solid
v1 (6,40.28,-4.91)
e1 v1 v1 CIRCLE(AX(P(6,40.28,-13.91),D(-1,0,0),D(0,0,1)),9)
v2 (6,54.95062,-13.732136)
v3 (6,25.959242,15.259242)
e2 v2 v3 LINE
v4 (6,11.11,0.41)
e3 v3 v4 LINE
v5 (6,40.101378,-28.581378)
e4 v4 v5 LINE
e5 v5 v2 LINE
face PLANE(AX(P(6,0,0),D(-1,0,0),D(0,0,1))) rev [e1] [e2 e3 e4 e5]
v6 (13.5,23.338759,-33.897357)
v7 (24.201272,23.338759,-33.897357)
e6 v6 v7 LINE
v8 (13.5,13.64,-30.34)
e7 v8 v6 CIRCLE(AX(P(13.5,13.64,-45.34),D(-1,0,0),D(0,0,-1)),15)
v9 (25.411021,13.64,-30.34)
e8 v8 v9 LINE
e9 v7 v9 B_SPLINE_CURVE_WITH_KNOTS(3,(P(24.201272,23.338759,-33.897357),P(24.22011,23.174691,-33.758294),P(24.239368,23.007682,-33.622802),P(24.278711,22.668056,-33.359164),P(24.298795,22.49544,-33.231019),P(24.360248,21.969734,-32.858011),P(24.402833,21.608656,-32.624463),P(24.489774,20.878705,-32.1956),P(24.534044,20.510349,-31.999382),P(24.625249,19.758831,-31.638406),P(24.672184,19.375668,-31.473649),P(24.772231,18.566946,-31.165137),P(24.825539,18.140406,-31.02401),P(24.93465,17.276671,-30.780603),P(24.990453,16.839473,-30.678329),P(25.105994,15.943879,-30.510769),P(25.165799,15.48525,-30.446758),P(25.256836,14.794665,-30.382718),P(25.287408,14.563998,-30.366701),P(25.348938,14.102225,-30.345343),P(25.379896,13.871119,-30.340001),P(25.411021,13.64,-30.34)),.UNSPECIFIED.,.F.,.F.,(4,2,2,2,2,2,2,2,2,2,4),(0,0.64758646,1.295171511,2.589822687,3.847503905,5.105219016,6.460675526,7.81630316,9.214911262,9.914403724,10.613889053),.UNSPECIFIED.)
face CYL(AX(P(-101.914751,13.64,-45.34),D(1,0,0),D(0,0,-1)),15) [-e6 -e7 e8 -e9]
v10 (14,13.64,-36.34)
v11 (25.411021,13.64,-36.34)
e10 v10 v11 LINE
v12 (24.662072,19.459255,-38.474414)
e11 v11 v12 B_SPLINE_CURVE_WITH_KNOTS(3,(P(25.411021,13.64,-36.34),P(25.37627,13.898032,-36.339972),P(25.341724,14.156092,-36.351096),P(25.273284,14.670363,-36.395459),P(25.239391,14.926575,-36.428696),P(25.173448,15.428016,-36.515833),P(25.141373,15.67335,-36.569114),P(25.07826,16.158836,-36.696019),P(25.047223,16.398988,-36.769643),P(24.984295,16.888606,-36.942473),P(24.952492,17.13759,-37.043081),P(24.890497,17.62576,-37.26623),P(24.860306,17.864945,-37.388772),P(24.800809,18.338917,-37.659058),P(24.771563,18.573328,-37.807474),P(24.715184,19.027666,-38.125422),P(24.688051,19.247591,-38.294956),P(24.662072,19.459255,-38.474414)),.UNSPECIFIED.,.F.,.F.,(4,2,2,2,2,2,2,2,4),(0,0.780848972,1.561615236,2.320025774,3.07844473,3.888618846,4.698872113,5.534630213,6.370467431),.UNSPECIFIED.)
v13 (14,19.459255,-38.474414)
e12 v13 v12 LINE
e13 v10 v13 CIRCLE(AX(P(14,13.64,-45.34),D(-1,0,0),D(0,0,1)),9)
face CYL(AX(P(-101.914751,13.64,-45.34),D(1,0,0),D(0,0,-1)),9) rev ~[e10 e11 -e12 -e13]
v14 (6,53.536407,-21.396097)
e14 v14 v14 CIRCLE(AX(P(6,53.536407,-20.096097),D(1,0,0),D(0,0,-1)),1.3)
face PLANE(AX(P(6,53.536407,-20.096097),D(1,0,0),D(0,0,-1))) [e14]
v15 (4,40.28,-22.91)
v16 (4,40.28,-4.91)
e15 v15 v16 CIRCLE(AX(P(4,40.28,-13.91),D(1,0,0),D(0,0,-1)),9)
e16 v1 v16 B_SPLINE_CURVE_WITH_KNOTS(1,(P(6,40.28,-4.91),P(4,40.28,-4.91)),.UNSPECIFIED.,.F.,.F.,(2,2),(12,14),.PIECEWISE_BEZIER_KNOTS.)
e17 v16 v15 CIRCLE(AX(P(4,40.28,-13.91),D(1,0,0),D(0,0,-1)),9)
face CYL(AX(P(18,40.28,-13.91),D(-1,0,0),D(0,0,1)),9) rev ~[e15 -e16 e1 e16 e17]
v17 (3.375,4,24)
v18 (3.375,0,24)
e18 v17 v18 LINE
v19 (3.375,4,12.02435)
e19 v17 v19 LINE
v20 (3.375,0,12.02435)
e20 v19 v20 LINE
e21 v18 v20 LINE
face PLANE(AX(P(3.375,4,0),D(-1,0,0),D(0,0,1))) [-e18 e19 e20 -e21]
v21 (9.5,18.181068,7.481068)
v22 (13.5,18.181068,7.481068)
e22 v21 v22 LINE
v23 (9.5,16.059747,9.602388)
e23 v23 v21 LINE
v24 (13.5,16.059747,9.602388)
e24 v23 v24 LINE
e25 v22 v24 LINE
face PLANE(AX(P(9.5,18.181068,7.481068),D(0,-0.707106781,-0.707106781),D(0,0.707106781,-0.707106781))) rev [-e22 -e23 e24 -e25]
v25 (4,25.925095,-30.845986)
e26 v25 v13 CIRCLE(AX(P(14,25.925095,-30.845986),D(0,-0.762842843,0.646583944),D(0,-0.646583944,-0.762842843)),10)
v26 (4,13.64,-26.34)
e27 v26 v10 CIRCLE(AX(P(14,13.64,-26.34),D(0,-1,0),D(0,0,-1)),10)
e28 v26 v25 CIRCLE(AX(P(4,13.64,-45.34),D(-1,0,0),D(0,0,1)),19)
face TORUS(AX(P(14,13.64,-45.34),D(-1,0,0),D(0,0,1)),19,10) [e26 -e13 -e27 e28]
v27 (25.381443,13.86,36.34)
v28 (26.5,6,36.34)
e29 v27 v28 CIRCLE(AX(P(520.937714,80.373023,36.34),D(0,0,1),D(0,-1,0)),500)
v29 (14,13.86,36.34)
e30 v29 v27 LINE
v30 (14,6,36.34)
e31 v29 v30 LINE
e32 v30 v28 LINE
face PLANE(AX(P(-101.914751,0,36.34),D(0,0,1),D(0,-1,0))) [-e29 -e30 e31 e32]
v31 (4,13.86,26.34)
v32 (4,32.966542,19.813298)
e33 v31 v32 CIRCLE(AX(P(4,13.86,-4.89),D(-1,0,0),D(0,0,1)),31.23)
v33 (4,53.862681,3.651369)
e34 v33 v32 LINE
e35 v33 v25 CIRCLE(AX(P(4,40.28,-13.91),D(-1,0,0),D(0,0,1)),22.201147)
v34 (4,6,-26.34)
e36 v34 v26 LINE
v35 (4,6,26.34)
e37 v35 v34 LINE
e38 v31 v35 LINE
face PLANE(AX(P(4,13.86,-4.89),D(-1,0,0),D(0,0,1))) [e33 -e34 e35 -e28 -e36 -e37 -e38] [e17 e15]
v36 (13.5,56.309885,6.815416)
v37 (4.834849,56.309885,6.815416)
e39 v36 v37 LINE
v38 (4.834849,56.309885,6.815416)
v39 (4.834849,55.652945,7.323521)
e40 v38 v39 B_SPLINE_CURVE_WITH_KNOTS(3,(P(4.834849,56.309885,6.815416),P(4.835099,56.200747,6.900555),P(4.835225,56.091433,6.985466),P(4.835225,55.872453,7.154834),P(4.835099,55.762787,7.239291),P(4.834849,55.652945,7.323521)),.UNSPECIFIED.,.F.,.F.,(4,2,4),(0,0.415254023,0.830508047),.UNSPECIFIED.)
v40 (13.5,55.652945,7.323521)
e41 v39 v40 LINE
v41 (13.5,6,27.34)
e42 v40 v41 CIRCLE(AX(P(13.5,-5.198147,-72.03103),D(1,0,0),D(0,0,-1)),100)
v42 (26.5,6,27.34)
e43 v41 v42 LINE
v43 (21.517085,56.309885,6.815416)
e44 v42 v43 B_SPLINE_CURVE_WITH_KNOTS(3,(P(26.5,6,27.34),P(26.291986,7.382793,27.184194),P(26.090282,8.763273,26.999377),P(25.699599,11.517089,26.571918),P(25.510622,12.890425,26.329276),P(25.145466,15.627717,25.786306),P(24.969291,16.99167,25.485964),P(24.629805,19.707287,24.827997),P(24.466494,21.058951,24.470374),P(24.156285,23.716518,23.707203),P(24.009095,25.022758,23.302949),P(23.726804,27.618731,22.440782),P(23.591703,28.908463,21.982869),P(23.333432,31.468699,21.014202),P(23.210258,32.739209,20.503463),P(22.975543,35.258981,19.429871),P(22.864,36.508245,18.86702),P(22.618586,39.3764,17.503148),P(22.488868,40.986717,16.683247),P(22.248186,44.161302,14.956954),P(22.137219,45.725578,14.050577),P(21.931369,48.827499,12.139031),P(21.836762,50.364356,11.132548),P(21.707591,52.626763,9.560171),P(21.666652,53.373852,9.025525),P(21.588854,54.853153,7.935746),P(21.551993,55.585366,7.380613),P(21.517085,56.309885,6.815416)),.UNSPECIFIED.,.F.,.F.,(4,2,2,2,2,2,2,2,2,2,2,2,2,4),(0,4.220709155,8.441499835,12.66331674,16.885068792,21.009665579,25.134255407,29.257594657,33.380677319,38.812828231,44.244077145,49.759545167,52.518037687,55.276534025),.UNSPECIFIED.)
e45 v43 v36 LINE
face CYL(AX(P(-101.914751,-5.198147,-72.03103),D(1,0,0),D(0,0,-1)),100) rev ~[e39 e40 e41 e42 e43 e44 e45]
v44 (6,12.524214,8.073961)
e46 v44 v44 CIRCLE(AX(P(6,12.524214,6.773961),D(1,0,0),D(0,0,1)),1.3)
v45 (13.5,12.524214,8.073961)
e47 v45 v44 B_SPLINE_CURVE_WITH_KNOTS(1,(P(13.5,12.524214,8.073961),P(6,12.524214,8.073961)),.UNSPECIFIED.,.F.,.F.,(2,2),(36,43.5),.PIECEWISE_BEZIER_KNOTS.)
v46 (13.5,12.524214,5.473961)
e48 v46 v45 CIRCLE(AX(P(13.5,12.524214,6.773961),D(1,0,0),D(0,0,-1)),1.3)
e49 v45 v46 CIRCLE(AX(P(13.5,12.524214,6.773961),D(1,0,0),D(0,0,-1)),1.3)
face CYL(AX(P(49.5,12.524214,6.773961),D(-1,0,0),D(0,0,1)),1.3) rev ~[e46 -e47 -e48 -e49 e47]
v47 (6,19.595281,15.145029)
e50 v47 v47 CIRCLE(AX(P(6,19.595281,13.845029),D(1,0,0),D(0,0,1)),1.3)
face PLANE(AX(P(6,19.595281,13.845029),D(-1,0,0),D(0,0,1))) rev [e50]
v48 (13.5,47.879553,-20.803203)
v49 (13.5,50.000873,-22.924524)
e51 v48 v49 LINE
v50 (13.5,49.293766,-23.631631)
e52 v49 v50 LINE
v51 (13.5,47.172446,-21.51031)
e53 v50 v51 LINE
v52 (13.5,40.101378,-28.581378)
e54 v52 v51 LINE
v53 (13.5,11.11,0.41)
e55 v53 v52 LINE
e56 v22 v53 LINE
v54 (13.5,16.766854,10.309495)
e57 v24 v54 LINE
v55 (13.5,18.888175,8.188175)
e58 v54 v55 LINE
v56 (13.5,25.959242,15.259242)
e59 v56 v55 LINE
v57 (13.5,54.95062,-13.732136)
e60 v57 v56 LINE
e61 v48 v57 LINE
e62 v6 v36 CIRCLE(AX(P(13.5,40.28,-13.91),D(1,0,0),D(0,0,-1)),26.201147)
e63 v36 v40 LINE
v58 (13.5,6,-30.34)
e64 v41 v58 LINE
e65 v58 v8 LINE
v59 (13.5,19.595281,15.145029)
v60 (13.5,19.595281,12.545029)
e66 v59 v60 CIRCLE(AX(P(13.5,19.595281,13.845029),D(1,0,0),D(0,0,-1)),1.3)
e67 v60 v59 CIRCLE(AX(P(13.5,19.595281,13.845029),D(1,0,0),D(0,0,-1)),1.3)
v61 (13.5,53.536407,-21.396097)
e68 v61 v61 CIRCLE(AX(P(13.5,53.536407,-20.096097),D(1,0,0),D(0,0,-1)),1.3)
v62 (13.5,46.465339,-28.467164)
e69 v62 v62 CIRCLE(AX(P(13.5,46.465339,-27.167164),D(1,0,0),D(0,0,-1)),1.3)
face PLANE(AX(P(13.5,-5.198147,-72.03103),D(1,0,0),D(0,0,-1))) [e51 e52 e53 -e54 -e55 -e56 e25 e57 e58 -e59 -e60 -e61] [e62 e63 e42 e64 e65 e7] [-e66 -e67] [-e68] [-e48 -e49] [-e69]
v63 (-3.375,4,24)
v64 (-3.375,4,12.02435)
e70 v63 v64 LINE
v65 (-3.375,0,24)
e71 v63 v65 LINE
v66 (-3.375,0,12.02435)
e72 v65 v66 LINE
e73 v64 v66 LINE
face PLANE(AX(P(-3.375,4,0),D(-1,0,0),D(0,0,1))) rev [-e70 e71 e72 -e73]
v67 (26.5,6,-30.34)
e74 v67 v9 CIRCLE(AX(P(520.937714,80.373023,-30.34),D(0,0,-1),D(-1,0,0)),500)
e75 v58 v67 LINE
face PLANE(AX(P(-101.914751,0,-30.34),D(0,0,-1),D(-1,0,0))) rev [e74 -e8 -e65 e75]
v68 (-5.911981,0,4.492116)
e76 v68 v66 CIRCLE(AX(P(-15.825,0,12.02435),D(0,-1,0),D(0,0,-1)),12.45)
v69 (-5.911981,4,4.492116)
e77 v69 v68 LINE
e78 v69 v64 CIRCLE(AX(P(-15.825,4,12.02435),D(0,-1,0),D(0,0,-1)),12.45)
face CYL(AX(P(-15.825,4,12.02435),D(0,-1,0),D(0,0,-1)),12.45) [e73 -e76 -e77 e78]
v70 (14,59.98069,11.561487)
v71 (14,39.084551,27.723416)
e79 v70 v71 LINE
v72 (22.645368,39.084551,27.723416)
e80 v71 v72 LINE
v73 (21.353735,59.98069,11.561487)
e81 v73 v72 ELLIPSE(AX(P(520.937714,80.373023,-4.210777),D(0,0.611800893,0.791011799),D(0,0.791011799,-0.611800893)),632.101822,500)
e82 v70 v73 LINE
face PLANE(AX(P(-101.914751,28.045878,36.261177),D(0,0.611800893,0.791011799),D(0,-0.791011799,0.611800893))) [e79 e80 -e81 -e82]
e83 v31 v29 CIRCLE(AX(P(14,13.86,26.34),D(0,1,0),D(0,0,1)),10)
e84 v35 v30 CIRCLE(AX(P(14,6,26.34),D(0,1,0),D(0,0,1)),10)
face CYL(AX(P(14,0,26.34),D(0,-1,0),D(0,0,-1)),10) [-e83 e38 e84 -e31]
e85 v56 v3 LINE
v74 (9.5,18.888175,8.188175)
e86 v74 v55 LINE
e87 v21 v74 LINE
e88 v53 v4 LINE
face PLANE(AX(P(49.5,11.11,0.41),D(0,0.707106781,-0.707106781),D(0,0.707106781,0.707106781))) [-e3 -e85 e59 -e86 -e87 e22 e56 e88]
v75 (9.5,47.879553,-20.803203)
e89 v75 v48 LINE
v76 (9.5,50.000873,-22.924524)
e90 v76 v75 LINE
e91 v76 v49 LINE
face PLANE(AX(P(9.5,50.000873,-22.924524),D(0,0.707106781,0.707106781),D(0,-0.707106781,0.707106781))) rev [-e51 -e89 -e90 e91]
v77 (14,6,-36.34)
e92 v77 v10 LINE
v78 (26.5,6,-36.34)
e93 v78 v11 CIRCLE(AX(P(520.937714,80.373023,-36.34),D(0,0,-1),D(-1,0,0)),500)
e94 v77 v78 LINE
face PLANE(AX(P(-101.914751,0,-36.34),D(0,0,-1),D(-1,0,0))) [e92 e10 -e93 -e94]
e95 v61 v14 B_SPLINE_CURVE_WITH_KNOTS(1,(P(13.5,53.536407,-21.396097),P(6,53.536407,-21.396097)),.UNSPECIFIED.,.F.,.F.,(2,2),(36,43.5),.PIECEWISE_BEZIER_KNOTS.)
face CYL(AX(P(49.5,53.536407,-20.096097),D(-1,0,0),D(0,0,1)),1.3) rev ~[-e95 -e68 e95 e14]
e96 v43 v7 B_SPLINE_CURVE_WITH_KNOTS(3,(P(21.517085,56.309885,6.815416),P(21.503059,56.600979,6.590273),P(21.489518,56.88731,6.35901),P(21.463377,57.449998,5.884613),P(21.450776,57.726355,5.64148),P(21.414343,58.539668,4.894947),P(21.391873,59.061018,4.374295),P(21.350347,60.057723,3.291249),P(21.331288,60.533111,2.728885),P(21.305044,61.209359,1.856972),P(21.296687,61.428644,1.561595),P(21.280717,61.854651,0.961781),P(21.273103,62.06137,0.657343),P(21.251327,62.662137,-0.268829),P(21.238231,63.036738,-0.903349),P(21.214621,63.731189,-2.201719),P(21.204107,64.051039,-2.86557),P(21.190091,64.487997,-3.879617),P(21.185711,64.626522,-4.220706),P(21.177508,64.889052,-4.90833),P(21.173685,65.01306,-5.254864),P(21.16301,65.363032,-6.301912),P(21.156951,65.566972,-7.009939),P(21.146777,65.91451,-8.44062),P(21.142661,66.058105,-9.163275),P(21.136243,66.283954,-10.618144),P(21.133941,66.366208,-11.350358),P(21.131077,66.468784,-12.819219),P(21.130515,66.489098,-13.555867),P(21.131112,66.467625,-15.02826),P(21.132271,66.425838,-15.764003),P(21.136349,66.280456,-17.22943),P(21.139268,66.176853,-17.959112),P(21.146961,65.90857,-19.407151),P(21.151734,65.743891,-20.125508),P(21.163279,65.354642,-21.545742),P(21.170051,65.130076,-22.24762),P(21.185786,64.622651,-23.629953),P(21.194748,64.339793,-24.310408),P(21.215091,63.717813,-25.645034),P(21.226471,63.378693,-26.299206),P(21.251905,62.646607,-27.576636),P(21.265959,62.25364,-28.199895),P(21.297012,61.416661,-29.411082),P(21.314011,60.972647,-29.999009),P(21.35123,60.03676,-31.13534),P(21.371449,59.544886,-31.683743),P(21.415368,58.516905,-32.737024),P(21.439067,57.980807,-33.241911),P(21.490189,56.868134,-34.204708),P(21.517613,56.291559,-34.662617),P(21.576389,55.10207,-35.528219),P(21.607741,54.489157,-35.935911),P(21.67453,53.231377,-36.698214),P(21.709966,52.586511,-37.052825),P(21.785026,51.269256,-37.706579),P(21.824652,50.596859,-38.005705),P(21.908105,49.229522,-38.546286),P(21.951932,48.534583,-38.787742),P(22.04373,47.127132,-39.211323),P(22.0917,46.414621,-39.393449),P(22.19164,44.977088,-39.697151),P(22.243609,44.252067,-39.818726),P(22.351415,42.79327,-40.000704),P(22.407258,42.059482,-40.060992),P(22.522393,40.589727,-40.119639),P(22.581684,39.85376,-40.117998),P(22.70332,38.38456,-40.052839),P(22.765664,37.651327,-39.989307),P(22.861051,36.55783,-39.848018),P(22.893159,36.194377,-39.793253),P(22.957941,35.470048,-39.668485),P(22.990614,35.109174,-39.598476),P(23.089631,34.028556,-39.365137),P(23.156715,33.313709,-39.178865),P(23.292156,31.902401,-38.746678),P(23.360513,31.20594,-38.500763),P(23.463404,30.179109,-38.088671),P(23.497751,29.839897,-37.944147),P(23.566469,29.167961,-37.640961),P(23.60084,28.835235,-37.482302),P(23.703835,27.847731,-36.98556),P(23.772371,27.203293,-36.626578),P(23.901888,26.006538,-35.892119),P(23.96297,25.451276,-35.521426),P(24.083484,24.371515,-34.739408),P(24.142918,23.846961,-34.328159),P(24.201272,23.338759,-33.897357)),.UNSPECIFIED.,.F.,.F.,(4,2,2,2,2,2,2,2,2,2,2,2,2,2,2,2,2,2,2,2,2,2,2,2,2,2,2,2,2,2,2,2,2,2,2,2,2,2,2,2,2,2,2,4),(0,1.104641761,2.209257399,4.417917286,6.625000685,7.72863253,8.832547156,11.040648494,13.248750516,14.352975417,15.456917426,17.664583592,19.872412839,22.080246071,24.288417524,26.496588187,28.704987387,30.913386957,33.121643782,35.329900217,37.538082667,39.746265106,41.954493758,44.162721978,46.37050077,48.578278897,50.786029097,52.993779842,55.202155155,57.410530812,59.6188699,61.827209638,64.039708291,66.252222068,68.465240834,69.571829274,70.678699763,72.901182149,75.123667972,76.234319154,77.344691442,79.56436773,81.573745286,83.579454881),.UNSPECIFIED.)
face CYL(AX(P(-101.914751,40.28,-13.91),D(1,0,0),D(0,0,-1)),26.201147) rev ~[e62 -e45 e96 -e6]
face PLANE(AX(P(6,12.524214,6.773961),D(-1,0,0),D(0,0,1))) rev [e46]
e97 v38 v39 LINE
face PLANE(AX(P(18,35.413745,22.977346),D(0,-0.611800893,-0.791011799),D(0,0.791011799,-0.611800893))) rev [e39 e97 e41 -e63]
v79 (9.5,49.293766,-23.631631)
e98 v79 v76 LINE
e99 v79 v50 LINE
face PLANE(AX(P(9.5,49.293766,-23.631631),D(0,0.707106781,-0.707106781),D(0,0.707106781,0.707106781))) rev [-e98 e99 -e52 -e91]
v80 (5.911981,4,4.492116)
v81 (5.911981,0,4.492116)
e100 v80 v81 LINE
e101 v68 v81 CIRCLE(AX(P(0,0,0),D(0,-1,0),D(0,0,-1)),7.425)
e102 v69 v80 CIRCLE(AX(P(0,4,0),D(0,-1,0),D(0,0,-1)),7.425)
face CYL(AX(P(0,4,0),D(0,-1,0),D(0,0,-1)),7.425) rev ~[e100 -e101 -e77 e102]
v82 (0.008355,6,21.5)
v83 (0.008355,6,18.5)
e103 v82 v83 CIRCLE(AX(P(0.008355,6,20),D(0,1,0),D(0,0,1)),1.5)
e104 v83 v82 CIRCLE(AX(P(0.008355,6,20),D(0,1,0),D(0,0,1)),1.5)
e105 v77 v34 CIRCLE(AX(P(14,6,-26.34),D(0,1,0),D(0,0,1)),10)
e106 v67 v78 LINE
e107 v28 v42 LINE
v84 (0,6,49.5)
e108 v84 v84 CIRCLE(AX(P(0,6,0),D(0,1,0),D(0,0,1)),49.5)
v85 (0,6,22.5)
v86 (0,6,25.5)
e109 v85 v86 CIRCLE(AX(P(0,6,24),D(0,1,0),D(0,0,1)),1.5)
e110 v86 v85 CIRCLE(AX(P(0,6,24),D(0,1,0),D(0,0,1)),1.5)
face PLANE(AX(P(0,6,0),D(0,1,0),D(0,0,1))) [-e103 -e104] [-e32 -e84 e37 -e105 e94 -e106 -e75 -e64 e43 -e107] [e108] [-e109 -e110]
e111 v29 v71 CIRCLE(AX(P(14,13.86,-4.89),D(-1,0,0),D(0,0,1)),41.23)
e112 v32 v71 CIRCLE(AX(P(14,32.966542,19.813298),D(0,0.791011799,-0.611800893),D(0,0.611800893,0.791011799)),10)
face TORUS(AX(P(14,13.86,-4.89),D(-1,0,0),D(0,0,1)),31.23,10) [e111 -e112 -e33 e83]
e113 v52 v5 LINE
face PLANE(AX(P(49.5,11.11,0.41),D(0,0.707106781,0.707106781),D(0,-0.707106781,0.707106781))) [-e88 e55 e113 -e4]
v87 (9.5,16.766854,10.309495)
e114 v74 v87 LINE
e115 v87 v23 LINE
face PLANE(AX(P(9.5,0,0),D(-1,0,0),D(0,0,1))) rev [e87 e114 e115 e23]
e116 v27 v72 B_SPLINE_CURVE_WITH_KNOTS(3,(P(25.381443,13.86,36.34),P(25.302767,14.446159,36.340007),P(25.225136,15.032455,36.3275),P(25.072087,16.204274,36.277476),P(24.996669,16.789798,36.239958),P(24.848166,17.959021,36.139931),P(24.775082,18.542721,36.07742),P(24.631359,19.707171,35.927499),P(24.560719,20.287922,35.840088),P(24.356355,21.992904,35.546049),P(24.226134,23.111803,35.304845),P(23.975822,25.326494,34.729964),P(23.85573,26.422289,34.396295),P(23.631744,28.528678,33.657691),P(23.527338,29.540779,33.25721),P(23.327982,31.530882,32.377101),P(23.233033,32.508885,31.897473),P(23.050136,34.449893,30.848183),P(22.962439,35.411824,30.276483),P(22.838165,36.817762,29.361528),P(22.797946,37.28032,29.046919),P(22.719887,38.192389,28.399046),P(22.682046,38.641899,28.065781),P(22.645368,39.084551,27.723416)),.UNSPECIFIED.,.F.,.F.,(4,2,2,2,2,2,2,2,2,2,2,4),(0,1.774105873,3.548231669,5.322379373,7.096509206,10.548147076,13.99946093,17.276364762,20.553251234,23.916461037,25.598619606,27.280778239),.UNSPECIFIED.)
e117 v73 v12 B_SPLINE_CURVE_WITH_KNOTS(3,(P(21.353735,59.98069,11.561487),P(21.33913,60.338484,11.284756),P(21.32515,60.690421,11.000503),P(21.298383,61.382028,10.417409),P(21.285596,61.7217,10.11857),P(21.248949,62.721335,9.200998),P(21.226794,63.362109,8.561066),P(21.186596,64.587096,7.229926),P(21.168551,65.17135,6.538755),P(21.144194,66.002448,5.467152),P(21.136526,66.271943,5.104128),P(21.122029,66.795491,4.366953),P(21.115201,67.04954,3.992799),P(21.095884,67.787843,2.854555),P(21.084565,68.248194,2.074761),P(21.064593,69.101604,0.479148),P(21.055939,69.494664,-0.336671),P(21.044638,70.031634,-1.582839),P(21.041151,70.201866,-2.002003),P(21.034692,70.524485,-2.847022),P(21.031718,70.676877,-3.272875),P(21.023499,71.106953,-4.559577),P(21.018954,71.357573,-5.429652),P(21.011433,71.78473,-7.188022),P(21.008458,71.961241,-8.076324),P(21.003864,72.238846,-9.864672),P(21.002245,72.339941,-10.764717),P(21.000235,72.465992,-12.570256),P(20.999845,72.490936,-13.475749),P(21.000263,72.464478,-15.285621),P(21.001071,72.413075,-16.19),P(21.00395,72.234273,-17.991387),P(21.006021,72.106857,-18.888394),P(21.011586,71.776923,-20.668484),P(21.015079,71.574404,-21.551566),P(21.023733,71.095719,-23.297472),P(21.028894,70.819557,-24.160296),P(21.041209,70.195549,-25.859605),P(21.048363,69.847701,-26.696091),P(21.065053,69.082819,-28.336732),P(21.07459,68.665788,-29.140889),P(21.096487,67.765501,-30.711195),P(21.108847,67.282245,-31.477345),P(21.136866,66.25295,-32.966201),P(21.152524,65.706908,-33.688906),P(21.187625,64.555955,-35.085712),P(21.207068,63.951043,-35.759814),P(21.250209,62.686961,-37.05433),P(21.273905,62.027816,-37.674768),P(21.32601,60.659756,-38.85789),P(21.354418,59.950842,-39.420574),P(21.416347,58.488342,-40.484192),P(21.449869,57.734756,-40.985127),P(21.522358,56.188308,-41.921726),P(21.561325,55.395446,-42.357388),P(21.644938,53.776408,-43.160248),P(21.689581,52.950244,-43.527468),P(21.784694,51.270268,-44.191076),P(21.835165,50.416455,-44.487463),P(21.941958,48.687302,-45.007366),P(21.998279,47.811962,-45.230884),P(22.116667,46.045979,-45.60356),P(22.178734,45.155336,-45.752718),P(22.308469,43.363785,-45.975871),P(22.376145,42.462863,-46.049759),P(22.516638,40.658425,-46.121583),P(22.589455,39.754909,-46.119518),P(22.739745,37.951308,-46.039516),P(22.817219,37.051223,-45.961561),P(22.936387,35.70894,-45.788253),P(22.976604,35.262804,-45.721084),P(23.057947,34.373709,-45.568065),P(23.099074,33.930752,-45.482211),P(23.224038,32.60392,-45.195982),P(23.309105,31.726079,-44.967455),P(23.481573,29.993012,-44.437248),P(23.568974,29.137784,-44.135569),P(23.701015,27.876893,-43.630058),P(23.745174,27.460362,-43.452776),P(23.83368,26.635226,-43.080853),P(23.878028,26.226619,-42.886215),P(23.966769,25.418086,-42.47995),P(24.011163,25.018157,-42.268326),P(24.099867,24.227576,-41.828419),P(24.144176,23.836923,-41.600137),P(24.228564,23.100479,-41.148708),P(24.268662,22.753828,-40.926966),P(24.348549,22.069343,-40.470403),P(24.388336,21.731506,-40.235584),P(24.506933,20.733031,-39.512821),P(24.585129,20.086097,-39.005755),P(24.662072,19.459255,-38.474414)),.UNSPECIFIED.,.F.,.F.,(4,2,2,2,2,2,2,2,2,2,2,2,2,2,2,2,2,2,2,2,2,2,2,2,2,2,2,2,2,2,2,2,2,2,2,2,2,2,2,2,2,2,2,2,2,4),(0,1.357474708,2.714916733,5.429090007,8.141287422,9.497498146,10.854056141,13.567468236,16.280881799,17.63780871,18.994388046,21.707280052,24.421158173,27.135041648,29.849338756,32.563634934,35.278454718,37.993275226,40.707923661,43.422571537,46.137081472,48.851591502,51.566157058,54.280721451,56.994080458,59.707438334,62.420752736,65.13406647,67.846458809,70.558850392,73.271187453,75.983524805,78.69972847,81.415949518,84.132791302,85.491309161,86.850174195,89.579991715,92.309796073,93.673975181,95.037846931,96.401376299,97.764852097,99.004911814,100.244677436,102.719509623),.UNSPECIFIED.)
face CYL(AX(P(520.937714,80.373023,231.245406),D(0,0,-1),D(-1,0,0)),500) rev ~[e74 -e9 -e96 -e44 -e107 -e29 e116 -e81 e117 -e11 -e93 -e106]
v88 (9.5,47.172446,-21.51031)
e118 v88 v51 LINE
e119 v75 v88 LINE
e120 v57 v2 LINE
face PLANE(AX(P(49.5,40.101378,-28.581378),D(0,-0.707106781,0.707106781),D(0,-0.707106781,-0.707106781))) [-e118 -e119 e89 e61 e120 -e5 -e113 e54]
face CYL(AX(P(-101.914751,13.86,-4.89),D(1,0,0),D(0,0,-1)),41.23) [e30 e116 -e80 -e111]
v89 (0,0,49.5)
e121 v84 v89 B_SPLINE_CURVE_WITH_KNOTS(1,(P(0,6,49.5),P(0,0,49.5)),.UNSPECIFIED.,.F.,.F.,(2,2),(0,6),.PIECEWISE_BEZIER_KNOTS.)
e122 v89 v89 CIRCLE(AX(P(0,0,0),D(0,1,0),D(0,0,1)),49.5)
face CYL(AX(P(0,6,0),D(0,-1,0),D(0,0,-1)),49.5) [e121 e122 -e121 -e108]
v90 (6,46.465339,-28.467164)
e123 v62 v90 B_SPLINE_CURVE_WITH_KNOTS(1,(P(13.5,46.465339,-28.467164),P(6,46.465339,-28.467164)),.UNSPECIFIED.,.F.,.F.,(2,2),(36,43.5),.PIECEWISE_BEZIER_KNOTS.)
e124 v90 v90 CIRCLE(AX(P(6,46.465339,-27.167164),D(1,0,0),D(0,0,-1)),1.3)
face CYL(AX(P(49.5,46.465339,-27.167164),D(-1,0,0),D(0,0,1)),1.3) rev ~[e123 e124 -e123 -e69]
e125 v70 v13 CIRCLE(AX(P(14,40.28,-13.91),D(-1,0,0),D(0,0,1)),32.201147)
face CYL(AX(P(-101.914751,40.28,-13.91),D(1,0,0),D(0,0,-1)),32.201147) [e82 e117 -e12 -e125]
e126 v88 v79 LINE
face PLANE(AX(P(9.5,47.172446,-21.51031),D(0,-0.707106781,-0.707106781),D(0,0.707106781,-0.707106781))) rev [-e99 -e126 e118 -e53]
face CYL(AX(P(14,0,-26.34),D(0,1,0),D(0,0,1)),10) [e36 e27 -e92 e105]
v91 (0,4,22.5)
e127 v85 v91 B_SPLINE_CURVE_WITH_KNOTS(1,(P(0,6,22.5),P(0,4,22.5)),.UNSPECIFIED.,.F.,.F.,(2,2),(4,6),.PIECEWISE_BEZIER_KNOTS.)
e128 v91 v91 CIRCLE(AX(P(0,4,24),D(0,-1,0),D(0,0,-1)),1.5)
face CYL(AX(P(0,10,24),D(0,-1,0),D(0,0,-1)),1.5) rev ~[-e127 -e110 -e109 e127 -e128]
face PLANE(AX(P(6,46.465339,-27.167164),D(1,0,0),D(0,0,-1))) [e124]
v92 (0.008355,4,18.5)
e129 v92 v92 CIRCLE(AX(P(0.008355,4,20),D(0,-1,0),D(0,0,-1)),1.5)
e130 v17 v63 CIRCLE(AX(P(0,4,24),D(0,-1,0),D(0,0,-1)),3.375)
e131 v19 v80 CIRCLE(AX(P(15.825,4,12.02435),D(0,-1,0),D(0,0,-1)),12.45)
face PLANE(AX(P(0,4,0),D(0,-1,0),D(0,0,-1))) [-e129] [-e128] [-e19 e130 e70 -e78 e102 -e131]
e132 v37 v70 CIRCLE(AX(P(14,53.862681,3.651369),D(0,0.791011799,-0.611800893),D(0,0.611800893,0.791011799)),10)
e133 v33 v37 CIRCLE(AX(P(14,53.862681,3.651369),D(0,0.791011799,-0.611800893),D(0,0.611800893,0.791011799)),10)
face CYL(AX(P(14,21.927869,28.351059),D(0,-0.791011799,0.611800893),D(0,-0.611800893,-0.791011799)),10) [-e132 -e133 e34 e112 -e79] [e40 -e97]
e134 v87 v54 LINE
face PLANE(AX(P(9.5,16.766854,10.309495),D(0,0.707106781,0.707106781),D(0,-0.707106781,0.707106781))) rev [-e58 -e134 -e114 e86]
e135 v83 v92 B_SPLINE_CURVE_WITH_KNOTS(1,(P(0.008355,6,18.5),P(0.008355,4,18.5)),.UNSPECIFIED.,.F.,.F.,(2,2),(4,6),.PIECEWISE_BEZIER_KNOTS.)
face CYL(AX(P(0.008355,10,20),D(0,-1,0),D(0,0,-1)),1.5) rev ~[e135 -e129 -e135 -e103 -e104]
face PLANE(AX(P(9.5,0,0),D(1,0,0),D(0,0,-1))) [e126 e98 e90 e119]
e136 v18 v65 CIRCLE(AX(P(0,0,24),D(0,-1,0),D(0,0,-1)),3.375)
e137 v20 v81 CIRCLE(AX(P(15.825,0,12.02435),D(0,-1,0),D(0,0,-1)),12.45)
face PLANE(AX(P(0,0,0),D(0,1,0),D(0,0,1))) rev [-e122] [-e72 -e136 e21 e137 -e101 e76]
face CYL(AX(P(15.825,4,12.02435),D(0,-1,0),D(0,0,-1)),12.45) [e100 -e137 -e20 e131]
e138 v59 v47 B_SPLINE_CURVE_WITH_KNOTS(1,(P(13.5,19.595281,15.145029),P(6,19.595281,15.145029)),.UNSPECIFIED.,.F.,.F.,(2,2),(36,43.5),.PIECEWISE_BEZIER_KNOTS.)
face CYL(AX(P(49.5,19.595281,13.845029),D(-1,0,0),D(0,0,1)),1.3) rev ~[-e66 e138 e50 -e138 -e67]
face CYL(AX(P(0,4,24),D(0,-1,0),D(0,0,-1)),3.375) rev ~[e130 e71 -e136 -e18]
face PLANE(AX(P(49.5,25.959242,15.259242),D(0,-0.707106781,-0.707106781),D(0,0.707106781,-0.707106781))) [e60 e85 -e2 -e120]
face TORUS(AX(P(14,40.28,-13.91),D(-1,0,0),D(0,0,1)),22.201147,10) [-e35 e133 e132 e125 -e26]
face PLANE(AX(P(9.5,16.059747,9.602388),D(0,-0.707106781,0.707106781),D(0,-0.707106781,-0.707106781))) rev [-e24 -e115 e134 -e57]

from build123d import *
from build123d.topology import SkipClean

# Parameters (mm, degrees)
SKETCH1_R                       = 49.5
BOSS_EXTRUDE1_DEPTH             = 6
BOSS_EXTRUDE2_START             = 4
SKETCH3_R                       = 9
BOSS_EXTRUDE2_DEPTH             = 14
SKETCH4_R                       = 1.5
CUT_EXTRUDE2_DEPTH              = 4
CUT_EXTRUDE3_START              = 6
SKETCH5_R                       = 1.3
CUT_EXTRUDE3_DEPTH              = 91.541405022
BOSS_EXTRUDE3_DEPTH             = 9
BOSS_EXTRUDE3_DIRECTION_2_REACH = 108.894
CUT_EXTRUDE4_DEPTH              = 101.767140704
CUT_EXTRUDE4_DEPTH_BACK         = 101.767140704
FILLET1_R                       = 10
SKETCH4_3_R                     = 1.5
CUT_EXTRUDE5_DEPTH              = 10
CUT_EXTRUDE6_DEPTH              = 8.5
CUT_EXTRUDE8_START              = -4.5
CUT_EXTRUDE8_DEPTH              = 4.5


with BuildPart() as part:
    # Sketch1 → Boss-Extrude1 (new body)
    with BuildSketch(Plane(origin=(0, 0, 0), x_dir=(1, 0, 0), z_dir=(0, 1, 0))):
        with Locations(Location((0, 0, 0), (0, 0, 270))):
            Circle(SKETCH1_R)
    extrude(amount=BOSS_EXTRUDE1_DEPTH)

    # Sketch3 → Boss-Extrude2 (add)
    with BuildSketch(Plane(origin=(0, 0, 0), x_dir=(0, 0, -1), z_dir=(1, 0, 0)).offset(BOSS_EXTRUDE2_START)):
        with BuildLine():
            Line((30.34, 6), (-30.34, 6))
            Line((-30.34, 6), (-30.34, 13.86))
            ThreePointArc((-30.34, 13.86), (-28.448562423, 25.248290284), (-22.977345695, 35.413745473))
            Line((-22.977345695, 35.413745473), (-6.815416301, 56.309885037))
            ThreePointArc((-6.815416301, 56.309885037), (30.399692788, 60.641486363), (33.897357348, 23.338759155))
            ThreePointArc((33.897357348, 23.338759155), (31.257393001, 18.805286063), (30.34, 13.64))
            Line((30.34, 13.64), (30.34, 6))
        make_face()
        with Locations((13.91, 40.28)):
            Circle(SKETCH3_R, mode=Mode.SUBTRACT)
    extrude(amount=BOSS_EXTRUDE2_DEPTH)

    # Sketch4 → Cut-Extrude2 (cut)
    with BuildSketch(Plane.XZ):
        with BuildLine():
            ThreePointArc((-5.911981132, 4.49211577), (-4.02628005, 8.050346325), (-3.375, 12.024350294))
            Line((-3.375, 12.024350294), (-3.375, 24))
            ThreePointArc((-3.375, 24), (0, 27.375), (3.375, 24))
            Line((3.375, 24), (3.375, 12.024350294))
            ThreePointArc((3.375, 12.024350294), (4.02628005, 8.050346325), (5.911981132, 4.49211577))
            ThreePointArc((5.911981132, 4.49211577), (0, -7.425), (-5.911981132, 4.49211577))
        make_face()
        with Locations(Location((0.008355438, 20, 0), (0, 0, 270))):
            Circle(SKETCH4_R, mode=Mode.SUBTRACT)
        with Locations(Location((0, 24, 0), (0, 0, 270))):
            Circle(SKETCH4_R, mode=Mode.SUBTRACT)
    extrude(amount=-CUT_EXTRUDE2_DEPTH, mode=Mode.SUBTRACT)

    # Sketch5 → Cut-Extrude3 (cut, through all)
    with BuildSketch(Plane(origin=(0, 0, 0), x_dir=(0, 0, -1), z_dir=(1, 0, 0)).offset(CUT_EXTRUDE3_START)):
        with Locations(Location((27.167164466, 46.465339059, 0), (0, 0, 180))):
            Circle(SKETCH5_R)
        with Locations(Location((20.096096654, 53.536406871, 0), (0, 0, 180))):
            Circle(SKETCH5_R)
        with Locations(Location((-13.845028843, 19.595281374, 0), (0, 0, 180))):
            Circle(SKETCH5_R)
        with Locations(Location((-6.773961031, 12.524213562, 0), (0, 0, 180))):
            Circle(SKETCH5_R)
        Polygon((-0.41, 11.11), (28.581378029, 40.101378029), (13.732135624, 54.950620434), (-15.259242405, 25.959242405), align=None)
    extrude(amount=CUT_EXTRUDE3_DEPTH, mode=Mode.SUBTRACT)

    # Sketch6 → Boss-Extrude3 (add)
    with BuildSketch(Plane(origin=(18, 0, 0), x_dir=(0, 0, -1), z_dir=(1, 0, 0))):
        with BuildLine():
            ThreePointArc((-7.323520562, 55.652945058), (-7.070150425, 55.981942529), (-6.815416301, 56.309885037))
            ThreePointArc((-6.815416301, 56.309885037), (30.399692788, 60.641486363), (33.897357348, 23.338759155))
            ThreePointArc((33.897357348, 23.338759155), (31.257393001, 18.805286063), (30.34, 13.64))
            Line((30.34, 13.64), (30.34, 6))
            Line((30.34, 6), (36.34, 6))
            Line((36.34, 6), (36.34, 13.64))
            ThreePointArc((36.34, 13.64), (36.890435801, 16.739171638), (38.474414409, 19.459255493))
            ThreePointArc((38.474414409, 19.459255493), (34.175793024, 65.304218074), (-11.561487098, 59.980690397))
            Line((-11.561487098, 59.980690397), (-27.723416492, 39.084550833))
            ThreePointArc((-27.723416492, 39.084550833), (-34.126432833, 27.187823116), (-36.34, 13.86))
            Line((-36.34, 13.86), (-36.34, 6))
            Line((-36.34, 6), (-30.34, 6))
            Line((-30.34, 6), (-30.34, 13.86))
            ThreePointArc((-30.34, 13.86), (-28.448562423, 25.248290284), (-22.977345695, 35.413745473))
            Line((-22.977345695, 35.413745473), (-7.323520562, 55.652945058))
        make_face()
        with BuildLine():
            ThreePointArc((-27.34, 6), (-20.716272, 32.190863083), (-7.323520562, 55.652945058))
            Line((-7.323520562, 55.652945058), (-22.977345695, 35.413745473))
            ThreePointArc((-22.977345695, 35.413745473), (-28.448562423, 25.248290284), (-30.34, 13.86))
            Line((-30.34, 13.86), (-30.34, 6))
            Line((-30.34, 6), (-27.34, 6))
        make_face()
    extrude(amount=BOSS_EXTRUDE3_DEPTH)

    # Boss-Extrude3 direction 2: up to this face of the body (flat: up to its plane)
    boss_extrude3_direction_2_end = Plane(part.part.faces().sort_by_distance((4, 32.233427389, -6.147611346))[0])
    # Sketch6 → Boss-Extrude3 direction 2 (add, up to the picked face)
    with BuildSketch(Plane(origin=(18, 0, 0), x_dir=(0, 0, -1), z_dir=(1, 0, 0)), mode=Mode.PRIVATE) as boss_extrude3_direction_2_sk1:
        with BuildLine():
            ThreePointArc((-7.323520562, 55.652945058), (-7.070150425, 55.981942529), (-6.815416301, 56.309885037))
            ThreePointArc((-6.815416301, 56.309885037), (30.399692788, 60.641486363), (33.897357348, 23.338759155))
            ThreePointArc((33.897357348, 23.338759155), (31.257393001, 18.805286063), (30.34, 13.64))
            Line((30.34, 13.64), (30.34, 6))
            Line((30.34, 6), (36.34, 6))
            Line((36.34, 6), (36.34, 13.64))
            ThreePointArc((36.34, 13.64), (36.890435801, 16.739171638), (38.474414409, 19.459255493))
            ThreePointArc((38.474414409, 19.459255493), (34.175793024, 65.304218074), (-11.561487098, 59.980690397))
            Line((-11.561487098, 59.980690397), (-27.723416492, 39.084550833))
            ThreePointArc((-27.723416492, 39.084550833), (-34.126432833, 27.187823116), (-36.34, 13.86))
            Line((-36.34, 13.86), (-36.34, 6))
            Line((-36.34, 6), (-30.34, 6))
            Line((-30.34, 6), (-30.34, 13.86))
            ThreePointArc((-30.34, 13.86), (-28.448562423, 25.248290284), (-22.977345695, 35.413745473))
            Line((-22.977345695, 35.413745473), (-7.323520562, 55.652945058))
        make_face()
    boss_extrude3_direction_2_tool1 = split(extrude(boss_extrude3_direction_2_sk1.sketch, amount=-BOSS_EXTRUDE3_DIRECTION_2_REACH, mode=Mode.PRIVATE), bisect_by=boss_extrude3_direction_2_end, keep=Keep.BOTH, mode=Mode.PRIVATE)
    # Sketch6 → Boss-Extrude3 direction 2 (add, up to the picked face)
    with BuildSketch(Plane(origin=(18, 0, 0), x_dir=(0, 0, -1), z_dir=(1, 0, 0)), mode=Mode.PRIVATE) as boss_extrude3_direction_2_sk2:
        with BuildLine():
            ThreePointArc((-27.34, 6), (-20.716272, 32.190863083), (-7.323520562, 55.652945058))
            Line((-7.323520562, 55.652945058), (-22.977345695, 35.413745473))
            ThreePointArc((-22.977345695, 35.413745473), (-28.448562423, 25.248290284), (-30.34, 13.86))
            Line((-30.34, 13.86), (-30.34, 6))
            Line((-30.34, 6), (-27.34, 6))
        make_face()
    boss_extrude3_direction_2_tool2 = split(extrude(boss_extrude3_direction_2_sk2.sketch, amount=-BOSS_EXTRUDE3_DIRECTION_2_REACH, mode=Mode.PRIVATE), bisect_by=boss_extrude3_direction_2_end, keep=Keep.BOTH, mode=Mode.PRIVATE)
    add(boss_extrude3_direction_2_tool1.solids().sort_by(Axis((18, 56.62993, 7.907949), (-1, 0, 0)))[0])
    add(boss_extrude3_direction_2_tool2.solids().sort_by(Axis((18, 24.594123, 24.897114), (-1, 0, 0)))[0])

    # Sketch7 → Cut-Extrude4 (cut, two sides: drawn at the far end of the back side and taken through both)
    with BuildSketch(Plane.XY.offset(-CUT_EXTRUDE4_DEPTH_BACK)):
        with BuildLine():
            Line((247.767802528, 72.481146829), (27, 72.481146829))
            Line((27, 72.481146829), (21, 72.481146829))
            ThreePointArc((21, 72.481146829), (22.640053286, 39.148747277), (26.5, 6))
            Line((26.5, 6), (27, 6))
            Line((27, 6), (247.767802528, 6))
            Line((247.767802528, 6), (689.303407584, 6))
            Line((689.303407584, 6), (689.303407584, 72.481146829))
            Line((689.303407584, 72.481146829), (247.767802528, 72.481146829))
        make_face()
    extrude(amount=CUT_EXTRUDE4_DEPTH + CUT_EXTRUDE4_DEPTH_BACK, mode=Mode.SUBTRACT)

    # Fillet1
    # the kernel refuses this fillet: 10 mm, written as the material it takes off along each edge
    with BuildSketch(Plane(origin=(4, 13.86, 36.34), x_dir=(0, 0, -1), z_dir=(0, -1, 0))) as fillet1_piece_1:
        with BuildLine():
            CenterArc((FILLET1_R, FILLET1_R), FILLET1_R, 180, 90)
            Line((0, FILLET1_R), (0, 0))
            Line((0, 0), (FILLET1_R, 0))
        make_face()
    extrude(amount=7.86, mode=Mode.SUBTRACT)
    with BuildSketch(Plane(origin=(4, 13.86, -4.89), x_dir=(0, 0.6118008933556042, 0.7910117994627416), z_dir=(0, 0.7910117994627416, -0.6118008933556042))) as fillet1_piece_2:
        with BuildLine():
            CenterArc((41.23 - FILLET1_R, FILLET1_R), FILLET1_R, 270, 90)
            Line((41.23, FILLET1_R), (41.23, 0))
            Line((41.23, 0), (41.23 - FILLET1_R, 0))
        make_face()
    revolve(axis=Axis((4, 13.86, -4.89), (1, 0, 0)), revolution_arc=37.719833498, mode=Mode.SUBTRACT)
    with BuildSketch(Plane(origin=(4, 59.980690397, 11.561487098), x_dir=(0, -0.6118008933556051, -0.791011799462741), z_dir=(0, -0.791011799462741, 0.6118008933556051))) as fillet1_piece_3:
        with BuildLine():
            CenterArc((FILLET1_R, FILLET1_R), FILLET1_R, 180, 90)
            Line((0, FILLET1_R), (0, 0))
            Line((0, 0), (FILLET1_R, 0))
        make_face()
    extrude(amount=26.4169758, mode=Mode.SUBTRACT)
    with BuildSketch(Plane(origin=(4, 40.28, -13.91), x_dir=(0, -0.646583943664495, -0.7628428434450107), z_dir=(0, -0.7628428434450107, 0.646583943664495))) as fillet1_piece_4:
        with BuildLine():
            CenterArc((32.201146829 - FILLET1_R, FILLET1_R), FILLET1_R, 270, 90)
            Line((32.201146829, FILLET1_R), (32.201146829, 0))
            Line((32.201146829, 0), (32.201146829 - FILLET1_R, 0))
        make_face()
    revolve(axis=Axis((4, 40.28, -13.91), (1, 0, 0)), revolution_arc=182.564704766, mode=Mode.SUBTRACT)
    with BuildSketch(Plane(origin=(4, 6, -36.34), x_dir=(0, 0, 1), z_dir=(0, 1, 0))) as fillet1_piece_5:
        with BuildLine():
            CenterArc((FILLET1_R, FILLET1_R), FILLET1_R, 180, 90)
            Line((0, FILLET1_R), (0, 0))
            Line((0, 0), (FILLET1_R, 0))
        make_face()
    extrude(amount=7.64, mode=Mode.SUBTRACT)
    with BuildSketch(Plane(origin=(4, 13.64, -45.34), x_dir=(0, 0.646583943664497, 0.7628428434450091), z_dir=(0, 0.7628428434450091, -0.646583943664497))) as fillet1_piece_6:
        with BuildLine():
            CenterArc((9 + FILLET1_R, FILLET1_R), FILLET1_R, 180, 90)
            Line((9, FILLET1_R), (9, 0))
            Line((9, 0), (9 + FILLET1_R, 0))
        make_face()
    revolve(axis=Axis((4, 13.64, -45.34), (1, 0, 0)), revolution_arc=40.284538264, mode=Mode.SUBTRACT)

    # Sketch4<3> → Cut-Extrude5 (cut)
    with BuildSketch(Plane.XZ):
        with Locations(Location((0, 24, 0), (0, 0, 270))):
            Circle(SKETCH4_3_R)
        with Locations(Location((0.008355438, 20, 0), (0, 0, 270))):
            Circle(SKETCH4_3_R)
    extrude(amount=-CUT_EXTRUDE5_DEPTH, mode=Mode.SUBTRACT)

    # Sketch8 → Cut-Extrude6 (cut)
    with BuildSketch(Plane(origin=(18, 0, 0), x_dir=(0, 0, -1), z_dir=(1, 0, 0))):
        Polygon((-8.188174593, 18.888174593), (-7.481067812, 18.181067812), (-9.602388155, 16.059747468), (-10.309494937, 16.766854249), align=None)
        Polygon((22.924523779, 50.000872965), (20.803203436, 47.879552622), (21.510310217, 47.172445841), (23.63163056, 49.293766184), align=None)
    extrude(amount=-CUT_EXTRUDE6_DEPTH, mode=Mode.SUBTRACT)

    # Sketch9 → Cut-Extrude8 (cut)
    with SkipClean():  # the faces are left unmerged after this step: merging them gives an invalid solid
        with BuildSketch(Plane(origin=(18, 0, 0), x_dir=(0, 0, -1), z_dir=(1, 0, 0)).offset(CUT_EXTRUDE8_START)):
            with BuildLine():
                Line((-27.34, 6), (30.34, 6))
                Line((30.34, 6), (30.34, 13.64))
                ThreePointArc((30.34, 13.64), (31.257393001, 18.805286063), (33.897357348, 23.338759155))
                ThreePointArc((33.897357348, 23.338759155), (30.399692788, 60.641486363), (-6.815416301, 56.309885037))
                Line((-6.815416301, 56.309885037), (-7.323520562, 55.652945058))
                ThreePointArc((-7.323520562, 55.652945058), (-20.716272, 32.190863083), (-27.34, 6))
            make_face()
        extrude(amount=CUT_EXTRUDE8_DEPTH, mode=Mode.SUBTRACT)
    add(part.part.scale(1), mode=Mode.REPLACE)  # the faces are merged on a copy


solid = part.part
